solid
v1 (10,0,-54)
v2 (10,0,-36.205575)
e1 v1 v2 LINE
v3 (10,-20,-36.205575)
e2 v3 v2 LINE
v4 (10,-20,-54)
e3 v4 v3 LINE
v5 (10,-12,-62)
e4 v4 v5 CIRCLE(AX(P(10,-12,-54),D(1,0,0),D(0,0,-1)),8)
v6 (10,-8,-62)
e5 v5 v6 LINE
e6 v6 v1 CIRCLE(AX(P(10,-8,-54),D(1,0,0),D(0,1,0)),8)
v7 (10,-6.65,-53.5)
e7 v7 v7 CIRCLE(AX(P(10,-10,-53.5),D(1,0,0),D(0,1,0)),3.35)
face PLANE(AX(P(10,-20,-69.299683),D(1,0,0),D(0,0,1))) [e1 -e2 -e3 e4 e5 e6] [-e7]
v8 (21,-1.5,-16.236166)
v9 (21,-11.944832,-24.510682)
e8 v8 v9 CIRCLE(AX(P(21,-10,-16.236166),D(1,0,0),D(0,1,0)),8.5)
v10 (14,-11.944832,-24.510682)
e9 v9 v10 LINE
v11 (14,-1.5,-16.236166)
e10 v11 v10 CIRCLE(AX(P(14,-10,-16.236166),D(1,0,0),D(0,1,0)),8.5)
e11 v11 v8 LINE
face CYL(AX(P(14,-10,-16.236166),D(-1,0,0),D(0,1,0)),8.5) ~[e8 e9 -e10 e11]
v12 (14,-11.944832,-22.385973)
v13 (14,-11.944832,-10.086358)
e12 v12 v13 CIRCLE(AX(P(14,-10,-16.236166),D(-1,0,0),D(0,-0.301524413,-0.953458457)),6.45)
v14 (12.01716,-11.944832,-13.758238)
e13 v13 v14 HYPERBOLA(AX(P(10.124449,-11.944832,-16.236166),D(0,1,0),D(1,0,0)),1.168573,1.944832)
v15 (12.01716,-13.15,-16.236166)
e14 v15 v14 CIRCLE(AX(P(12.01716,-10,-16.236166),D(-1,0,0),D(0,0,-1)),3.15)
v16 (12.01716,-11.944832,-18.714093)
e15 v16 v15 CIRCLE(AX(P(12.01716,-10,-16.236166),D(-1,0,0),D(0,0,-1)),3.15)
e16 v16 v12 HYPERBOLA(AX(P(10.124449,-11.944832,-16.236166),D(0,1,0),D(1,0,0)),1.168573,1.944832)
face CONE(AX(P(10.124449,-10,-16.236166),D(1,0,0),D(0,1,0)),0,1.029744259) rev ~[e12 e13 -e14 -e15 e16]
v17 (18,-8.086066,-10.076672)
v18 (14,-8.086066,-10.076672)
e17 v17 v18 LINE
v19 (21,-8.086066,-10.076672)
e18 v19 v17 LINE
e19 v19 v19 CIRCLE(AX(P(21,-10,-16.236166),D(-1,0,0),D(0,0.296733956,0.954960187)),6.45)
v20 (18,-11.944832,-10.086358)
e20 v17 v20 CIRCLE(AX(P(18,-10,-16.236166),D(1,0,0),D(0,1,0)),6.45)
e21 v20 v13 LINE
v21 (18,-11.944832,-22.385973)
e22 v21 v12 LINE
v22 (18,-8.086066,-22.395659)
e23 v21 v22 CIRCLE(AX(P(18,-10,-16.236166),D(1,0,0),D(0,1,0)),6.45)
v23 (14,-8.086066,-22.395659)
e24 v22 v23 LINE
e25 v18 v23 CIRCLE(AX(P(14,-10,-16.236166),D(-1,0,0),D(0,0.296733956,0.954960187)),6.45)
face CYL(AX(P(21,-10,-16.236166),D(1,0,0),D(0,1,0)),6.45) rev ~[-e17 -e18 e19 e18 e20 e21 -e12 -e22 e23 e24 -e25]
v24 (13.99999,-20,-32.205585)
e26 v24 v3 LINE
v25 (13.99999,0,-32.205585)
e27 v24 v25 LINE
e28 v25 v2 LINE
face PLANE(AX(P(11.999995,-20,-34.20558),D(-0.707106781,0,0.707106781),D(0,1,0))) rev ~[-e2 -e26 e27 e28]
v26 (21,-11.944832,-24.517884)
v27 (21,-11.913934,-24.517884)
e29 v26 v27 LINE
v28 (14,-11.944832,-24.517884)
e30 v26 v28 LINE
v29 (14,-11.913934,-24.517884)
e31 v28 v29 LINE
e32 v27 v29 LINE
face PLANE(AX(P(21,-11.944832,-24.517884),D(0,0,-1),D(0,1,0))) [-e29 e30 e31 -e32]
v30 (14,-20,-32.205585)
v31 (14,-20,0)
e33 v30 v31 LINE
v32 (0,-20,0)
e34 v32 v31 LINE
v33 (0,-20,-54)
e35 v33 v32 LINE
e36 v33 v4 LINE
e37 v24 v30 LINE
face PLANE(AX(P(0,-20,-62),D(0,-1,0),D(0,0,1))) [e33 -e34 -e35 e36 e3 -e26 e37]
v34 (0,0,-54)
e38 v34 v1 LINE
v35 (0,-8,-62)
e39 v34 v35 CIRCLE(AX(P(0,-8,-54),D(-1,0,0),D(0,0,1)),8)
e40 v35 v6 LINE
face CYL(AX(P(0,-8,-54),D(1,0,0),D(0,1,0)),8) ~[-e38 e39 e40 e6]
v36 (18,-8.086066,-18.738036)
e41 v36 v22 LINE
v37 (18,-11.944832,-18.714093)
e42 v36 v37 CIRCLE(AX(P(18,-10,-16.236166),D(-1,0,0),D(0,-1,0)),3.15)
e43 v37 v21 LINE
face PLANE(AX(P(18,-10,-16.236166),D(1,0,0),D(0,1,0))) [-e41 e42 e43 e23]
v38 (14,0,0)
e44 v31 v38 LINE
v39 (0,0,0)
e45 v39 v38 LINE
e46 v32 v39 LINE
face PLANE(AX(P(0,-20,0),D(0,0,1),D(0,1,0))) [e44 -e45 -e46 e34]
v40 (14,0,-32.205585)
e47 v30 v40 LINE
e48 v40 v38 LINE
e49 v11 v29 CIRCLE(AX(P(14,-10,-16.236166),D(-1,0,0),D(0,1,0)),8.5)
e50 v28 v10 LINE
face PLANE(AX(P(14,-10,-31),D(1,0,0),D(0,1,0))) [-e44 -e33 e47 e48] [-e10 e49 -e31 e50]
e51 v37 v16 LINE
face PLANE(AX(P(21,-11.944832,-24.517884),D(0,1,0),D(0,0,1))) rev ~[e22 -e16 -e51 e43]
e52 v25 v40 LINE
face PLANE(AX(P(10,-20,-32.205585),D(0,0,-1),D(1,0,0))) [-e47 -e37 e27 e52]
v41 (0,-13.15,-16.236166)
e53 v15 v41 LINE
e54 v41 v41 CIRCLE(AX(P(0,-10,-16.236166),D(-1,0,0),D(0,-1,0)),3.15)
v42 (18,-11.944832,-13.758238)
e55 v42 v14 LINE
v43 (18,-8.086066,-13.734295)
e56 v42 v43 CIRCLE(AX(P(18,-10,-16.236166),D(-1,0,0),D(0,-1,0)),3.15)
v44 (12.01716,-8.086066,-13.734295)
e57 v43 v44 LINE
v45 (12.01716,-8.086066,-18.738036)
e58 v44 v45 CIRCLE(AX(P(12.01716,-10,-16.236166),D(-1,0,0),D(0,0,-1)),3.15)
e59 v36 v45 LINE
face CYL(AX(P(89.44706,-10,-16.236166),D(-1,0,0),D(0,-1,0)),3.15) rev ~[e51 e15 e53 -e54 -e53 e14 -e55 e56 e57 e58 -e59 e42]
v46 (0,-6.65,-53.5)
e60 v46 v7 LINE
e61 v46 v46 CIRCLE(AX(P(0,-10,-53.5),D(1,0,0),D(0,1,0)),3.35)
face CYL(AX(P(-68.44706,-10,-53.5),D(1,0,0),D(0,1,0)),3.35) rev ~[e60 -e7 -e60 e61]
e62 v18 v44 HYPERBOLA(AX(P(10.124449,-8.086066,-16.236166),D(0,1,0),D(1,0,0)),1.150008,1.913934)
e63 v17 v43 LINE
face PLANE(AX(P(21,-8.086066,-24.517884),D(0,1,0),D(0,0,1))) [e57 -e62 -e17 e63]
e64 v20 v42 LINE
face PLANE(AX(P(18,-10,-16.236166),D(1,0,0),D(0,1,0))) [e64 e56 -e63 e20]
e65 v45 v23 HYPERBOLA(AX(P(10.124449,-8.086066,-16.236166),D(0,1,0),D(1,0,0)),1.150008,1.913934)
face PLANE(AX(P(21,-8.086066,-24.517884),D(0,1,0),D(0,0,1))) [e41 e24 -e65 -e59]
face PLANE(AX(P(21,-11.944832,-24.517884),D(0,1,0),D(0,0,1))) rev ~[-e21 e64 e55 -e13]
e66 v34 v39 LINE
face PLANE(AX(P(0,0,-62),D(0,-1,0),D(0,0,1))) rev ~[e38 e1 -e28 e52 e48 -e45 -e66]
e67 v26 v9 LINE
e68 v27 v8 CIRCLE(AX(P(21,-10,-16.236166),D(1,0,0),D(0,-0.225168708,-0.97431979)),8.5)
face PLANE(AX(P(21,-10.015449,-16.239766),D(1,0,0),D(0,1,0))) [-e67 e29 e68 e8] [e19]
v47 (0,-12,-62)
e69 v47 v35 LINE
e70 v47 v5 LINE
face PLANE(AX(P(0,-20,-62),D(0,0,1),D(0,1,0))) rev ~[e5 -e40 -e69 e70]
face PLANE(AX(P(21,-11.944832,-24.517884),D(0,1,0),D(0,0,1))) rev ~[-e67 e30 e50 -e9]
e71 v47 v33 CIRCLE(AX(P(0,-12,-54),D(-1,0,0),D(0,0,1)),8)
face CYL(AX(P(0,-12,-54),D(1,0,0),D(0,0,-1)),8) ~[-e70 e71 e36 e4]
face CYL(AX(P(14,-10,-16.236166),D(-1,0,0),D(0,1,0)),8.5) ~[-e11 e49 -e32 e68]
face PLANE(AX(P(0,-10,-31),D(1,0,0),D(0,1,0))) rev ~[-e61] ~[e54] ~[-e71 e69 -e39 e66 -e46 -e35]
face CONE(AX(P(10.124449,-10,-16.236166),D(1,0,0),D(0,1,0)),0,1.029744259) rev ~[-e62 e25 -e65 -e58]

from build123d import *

# Parameters (mm, degrees)
F0_W      = 20
F0_H      = 62
F1_DEPTH  = 14
F2_R      = 8.5
F3_DEPTH  = 7
F5_D      = 12.9
F5_DEPTH  = 7
F5_TIP    = 3.8755509927
F6_W      = 3.8587664786
F6_H      = 16.5562349188
F7_DEPTH  = 11.59683
F9_D      = 6.3
F10_R     = 6.45
F11_DEPTH = 3
F12_R     = 8
F13_R     = 8
F14_W     = 4
F14_H     = 37.0940975845
F15_DEPTH = 25
F17_D     = 6.7
F18_SIZE  = 3.99999


# Not quite as in the source:
# - a fillet or chamfer is up to 0.001 mm smaller than in the source, because OpenCascade refuses the exact size


with BuildPart() as f1:
    # F0 (on Right) → F1 (new body)
    with BuildSketch(Plane.YZ):
        with Locations((-10, -31)):
            Rectangle(F0_W, F0_H)
    extrude(amount=F1_DEPTH)

    # F2 (on face) → F3 (join)
    with BuildSketch(Plane.YZ.offset(14)):
        with Locations((-10, -16.2361655384)):
            Circle(F2_R)
    extrude(amount=F3_DEPTH)

    # F5
    with Locations(Plane.YZ.offset(21)):
        with Locations((-10, -16.2361655384)):
            Hole(F5_D / 2, depth=F5_DEPTH)
            with Locations((0, 0, -(F5_DEPTH + F5_TIP / 2))):  # 118° drill point
                Cone(0, F5_D / 2, F5_TIP, mode=Mode.SUBTRACT)

    # F6 (on face) → F7 (join)
    with BuildSketch(Plane.YZ.offset(21)):
        with Locations((-10.015449224, -16.2397662935)):
            Rectangle(F6_W, F6_H)
    extrude(amount=-F7_DEPTH)

    # F9 (through all)
    with Locations(Plane.YZ.offset(21)):
        with Locations((-10, -16.2361655384)):
            Hole(F9_D / 2)

    # F10 (on face) → F11 (cut)
    with BuildSketch(Plane.YZ.offset(21)):
        with Locations((-10, -16.2361655384)):
            Circle(F10_R)
    extrude(amount=-F11_DEPTH, mode=Mode.SUBTRACT)

    # F12
    f12_edges = [f1.edges().sort_by_distance(p)[0] for p in [
        (7, 0, -62),
    ]]
    fillet(f12_edges, radius=F12_R)

    # F13
    f13_edges = [f1.edges().sort_by_distance(p)[0] for p in [
        (7, -20, -62),
    ]]
    fillet(f13_edges, radius=F13_R)

    # F14 (on face) → F15 (cut)
    with BuildSketch(Plane.XZ.offset(20)):
        with Locations((12, -50.7526341826)):
            Rectangle(F14_W, F14_H)
    extrude(amount=-F15_DEPTH, mode=Mode.SUBTRACT)

    # F17 (through all)
    with Locations(Plane(origin=(0, 0, 0), x_dir=(0, -1, 0), z_dir=(-1, 0, 0))):
        with Locations((10, -53.5)):
            Hole(F17_D / 2)

    # F18 (size 4 in the source; OpenCascade refuses exactly that, so slightly less here)
    f18_edges = [f1.edges().sort_by_distance(p)[0] for p in [
        (10, -10, -32.205585),
    ]]
    chamfer(f18_edges, length=F18_SIZE)


solid = f1.part
